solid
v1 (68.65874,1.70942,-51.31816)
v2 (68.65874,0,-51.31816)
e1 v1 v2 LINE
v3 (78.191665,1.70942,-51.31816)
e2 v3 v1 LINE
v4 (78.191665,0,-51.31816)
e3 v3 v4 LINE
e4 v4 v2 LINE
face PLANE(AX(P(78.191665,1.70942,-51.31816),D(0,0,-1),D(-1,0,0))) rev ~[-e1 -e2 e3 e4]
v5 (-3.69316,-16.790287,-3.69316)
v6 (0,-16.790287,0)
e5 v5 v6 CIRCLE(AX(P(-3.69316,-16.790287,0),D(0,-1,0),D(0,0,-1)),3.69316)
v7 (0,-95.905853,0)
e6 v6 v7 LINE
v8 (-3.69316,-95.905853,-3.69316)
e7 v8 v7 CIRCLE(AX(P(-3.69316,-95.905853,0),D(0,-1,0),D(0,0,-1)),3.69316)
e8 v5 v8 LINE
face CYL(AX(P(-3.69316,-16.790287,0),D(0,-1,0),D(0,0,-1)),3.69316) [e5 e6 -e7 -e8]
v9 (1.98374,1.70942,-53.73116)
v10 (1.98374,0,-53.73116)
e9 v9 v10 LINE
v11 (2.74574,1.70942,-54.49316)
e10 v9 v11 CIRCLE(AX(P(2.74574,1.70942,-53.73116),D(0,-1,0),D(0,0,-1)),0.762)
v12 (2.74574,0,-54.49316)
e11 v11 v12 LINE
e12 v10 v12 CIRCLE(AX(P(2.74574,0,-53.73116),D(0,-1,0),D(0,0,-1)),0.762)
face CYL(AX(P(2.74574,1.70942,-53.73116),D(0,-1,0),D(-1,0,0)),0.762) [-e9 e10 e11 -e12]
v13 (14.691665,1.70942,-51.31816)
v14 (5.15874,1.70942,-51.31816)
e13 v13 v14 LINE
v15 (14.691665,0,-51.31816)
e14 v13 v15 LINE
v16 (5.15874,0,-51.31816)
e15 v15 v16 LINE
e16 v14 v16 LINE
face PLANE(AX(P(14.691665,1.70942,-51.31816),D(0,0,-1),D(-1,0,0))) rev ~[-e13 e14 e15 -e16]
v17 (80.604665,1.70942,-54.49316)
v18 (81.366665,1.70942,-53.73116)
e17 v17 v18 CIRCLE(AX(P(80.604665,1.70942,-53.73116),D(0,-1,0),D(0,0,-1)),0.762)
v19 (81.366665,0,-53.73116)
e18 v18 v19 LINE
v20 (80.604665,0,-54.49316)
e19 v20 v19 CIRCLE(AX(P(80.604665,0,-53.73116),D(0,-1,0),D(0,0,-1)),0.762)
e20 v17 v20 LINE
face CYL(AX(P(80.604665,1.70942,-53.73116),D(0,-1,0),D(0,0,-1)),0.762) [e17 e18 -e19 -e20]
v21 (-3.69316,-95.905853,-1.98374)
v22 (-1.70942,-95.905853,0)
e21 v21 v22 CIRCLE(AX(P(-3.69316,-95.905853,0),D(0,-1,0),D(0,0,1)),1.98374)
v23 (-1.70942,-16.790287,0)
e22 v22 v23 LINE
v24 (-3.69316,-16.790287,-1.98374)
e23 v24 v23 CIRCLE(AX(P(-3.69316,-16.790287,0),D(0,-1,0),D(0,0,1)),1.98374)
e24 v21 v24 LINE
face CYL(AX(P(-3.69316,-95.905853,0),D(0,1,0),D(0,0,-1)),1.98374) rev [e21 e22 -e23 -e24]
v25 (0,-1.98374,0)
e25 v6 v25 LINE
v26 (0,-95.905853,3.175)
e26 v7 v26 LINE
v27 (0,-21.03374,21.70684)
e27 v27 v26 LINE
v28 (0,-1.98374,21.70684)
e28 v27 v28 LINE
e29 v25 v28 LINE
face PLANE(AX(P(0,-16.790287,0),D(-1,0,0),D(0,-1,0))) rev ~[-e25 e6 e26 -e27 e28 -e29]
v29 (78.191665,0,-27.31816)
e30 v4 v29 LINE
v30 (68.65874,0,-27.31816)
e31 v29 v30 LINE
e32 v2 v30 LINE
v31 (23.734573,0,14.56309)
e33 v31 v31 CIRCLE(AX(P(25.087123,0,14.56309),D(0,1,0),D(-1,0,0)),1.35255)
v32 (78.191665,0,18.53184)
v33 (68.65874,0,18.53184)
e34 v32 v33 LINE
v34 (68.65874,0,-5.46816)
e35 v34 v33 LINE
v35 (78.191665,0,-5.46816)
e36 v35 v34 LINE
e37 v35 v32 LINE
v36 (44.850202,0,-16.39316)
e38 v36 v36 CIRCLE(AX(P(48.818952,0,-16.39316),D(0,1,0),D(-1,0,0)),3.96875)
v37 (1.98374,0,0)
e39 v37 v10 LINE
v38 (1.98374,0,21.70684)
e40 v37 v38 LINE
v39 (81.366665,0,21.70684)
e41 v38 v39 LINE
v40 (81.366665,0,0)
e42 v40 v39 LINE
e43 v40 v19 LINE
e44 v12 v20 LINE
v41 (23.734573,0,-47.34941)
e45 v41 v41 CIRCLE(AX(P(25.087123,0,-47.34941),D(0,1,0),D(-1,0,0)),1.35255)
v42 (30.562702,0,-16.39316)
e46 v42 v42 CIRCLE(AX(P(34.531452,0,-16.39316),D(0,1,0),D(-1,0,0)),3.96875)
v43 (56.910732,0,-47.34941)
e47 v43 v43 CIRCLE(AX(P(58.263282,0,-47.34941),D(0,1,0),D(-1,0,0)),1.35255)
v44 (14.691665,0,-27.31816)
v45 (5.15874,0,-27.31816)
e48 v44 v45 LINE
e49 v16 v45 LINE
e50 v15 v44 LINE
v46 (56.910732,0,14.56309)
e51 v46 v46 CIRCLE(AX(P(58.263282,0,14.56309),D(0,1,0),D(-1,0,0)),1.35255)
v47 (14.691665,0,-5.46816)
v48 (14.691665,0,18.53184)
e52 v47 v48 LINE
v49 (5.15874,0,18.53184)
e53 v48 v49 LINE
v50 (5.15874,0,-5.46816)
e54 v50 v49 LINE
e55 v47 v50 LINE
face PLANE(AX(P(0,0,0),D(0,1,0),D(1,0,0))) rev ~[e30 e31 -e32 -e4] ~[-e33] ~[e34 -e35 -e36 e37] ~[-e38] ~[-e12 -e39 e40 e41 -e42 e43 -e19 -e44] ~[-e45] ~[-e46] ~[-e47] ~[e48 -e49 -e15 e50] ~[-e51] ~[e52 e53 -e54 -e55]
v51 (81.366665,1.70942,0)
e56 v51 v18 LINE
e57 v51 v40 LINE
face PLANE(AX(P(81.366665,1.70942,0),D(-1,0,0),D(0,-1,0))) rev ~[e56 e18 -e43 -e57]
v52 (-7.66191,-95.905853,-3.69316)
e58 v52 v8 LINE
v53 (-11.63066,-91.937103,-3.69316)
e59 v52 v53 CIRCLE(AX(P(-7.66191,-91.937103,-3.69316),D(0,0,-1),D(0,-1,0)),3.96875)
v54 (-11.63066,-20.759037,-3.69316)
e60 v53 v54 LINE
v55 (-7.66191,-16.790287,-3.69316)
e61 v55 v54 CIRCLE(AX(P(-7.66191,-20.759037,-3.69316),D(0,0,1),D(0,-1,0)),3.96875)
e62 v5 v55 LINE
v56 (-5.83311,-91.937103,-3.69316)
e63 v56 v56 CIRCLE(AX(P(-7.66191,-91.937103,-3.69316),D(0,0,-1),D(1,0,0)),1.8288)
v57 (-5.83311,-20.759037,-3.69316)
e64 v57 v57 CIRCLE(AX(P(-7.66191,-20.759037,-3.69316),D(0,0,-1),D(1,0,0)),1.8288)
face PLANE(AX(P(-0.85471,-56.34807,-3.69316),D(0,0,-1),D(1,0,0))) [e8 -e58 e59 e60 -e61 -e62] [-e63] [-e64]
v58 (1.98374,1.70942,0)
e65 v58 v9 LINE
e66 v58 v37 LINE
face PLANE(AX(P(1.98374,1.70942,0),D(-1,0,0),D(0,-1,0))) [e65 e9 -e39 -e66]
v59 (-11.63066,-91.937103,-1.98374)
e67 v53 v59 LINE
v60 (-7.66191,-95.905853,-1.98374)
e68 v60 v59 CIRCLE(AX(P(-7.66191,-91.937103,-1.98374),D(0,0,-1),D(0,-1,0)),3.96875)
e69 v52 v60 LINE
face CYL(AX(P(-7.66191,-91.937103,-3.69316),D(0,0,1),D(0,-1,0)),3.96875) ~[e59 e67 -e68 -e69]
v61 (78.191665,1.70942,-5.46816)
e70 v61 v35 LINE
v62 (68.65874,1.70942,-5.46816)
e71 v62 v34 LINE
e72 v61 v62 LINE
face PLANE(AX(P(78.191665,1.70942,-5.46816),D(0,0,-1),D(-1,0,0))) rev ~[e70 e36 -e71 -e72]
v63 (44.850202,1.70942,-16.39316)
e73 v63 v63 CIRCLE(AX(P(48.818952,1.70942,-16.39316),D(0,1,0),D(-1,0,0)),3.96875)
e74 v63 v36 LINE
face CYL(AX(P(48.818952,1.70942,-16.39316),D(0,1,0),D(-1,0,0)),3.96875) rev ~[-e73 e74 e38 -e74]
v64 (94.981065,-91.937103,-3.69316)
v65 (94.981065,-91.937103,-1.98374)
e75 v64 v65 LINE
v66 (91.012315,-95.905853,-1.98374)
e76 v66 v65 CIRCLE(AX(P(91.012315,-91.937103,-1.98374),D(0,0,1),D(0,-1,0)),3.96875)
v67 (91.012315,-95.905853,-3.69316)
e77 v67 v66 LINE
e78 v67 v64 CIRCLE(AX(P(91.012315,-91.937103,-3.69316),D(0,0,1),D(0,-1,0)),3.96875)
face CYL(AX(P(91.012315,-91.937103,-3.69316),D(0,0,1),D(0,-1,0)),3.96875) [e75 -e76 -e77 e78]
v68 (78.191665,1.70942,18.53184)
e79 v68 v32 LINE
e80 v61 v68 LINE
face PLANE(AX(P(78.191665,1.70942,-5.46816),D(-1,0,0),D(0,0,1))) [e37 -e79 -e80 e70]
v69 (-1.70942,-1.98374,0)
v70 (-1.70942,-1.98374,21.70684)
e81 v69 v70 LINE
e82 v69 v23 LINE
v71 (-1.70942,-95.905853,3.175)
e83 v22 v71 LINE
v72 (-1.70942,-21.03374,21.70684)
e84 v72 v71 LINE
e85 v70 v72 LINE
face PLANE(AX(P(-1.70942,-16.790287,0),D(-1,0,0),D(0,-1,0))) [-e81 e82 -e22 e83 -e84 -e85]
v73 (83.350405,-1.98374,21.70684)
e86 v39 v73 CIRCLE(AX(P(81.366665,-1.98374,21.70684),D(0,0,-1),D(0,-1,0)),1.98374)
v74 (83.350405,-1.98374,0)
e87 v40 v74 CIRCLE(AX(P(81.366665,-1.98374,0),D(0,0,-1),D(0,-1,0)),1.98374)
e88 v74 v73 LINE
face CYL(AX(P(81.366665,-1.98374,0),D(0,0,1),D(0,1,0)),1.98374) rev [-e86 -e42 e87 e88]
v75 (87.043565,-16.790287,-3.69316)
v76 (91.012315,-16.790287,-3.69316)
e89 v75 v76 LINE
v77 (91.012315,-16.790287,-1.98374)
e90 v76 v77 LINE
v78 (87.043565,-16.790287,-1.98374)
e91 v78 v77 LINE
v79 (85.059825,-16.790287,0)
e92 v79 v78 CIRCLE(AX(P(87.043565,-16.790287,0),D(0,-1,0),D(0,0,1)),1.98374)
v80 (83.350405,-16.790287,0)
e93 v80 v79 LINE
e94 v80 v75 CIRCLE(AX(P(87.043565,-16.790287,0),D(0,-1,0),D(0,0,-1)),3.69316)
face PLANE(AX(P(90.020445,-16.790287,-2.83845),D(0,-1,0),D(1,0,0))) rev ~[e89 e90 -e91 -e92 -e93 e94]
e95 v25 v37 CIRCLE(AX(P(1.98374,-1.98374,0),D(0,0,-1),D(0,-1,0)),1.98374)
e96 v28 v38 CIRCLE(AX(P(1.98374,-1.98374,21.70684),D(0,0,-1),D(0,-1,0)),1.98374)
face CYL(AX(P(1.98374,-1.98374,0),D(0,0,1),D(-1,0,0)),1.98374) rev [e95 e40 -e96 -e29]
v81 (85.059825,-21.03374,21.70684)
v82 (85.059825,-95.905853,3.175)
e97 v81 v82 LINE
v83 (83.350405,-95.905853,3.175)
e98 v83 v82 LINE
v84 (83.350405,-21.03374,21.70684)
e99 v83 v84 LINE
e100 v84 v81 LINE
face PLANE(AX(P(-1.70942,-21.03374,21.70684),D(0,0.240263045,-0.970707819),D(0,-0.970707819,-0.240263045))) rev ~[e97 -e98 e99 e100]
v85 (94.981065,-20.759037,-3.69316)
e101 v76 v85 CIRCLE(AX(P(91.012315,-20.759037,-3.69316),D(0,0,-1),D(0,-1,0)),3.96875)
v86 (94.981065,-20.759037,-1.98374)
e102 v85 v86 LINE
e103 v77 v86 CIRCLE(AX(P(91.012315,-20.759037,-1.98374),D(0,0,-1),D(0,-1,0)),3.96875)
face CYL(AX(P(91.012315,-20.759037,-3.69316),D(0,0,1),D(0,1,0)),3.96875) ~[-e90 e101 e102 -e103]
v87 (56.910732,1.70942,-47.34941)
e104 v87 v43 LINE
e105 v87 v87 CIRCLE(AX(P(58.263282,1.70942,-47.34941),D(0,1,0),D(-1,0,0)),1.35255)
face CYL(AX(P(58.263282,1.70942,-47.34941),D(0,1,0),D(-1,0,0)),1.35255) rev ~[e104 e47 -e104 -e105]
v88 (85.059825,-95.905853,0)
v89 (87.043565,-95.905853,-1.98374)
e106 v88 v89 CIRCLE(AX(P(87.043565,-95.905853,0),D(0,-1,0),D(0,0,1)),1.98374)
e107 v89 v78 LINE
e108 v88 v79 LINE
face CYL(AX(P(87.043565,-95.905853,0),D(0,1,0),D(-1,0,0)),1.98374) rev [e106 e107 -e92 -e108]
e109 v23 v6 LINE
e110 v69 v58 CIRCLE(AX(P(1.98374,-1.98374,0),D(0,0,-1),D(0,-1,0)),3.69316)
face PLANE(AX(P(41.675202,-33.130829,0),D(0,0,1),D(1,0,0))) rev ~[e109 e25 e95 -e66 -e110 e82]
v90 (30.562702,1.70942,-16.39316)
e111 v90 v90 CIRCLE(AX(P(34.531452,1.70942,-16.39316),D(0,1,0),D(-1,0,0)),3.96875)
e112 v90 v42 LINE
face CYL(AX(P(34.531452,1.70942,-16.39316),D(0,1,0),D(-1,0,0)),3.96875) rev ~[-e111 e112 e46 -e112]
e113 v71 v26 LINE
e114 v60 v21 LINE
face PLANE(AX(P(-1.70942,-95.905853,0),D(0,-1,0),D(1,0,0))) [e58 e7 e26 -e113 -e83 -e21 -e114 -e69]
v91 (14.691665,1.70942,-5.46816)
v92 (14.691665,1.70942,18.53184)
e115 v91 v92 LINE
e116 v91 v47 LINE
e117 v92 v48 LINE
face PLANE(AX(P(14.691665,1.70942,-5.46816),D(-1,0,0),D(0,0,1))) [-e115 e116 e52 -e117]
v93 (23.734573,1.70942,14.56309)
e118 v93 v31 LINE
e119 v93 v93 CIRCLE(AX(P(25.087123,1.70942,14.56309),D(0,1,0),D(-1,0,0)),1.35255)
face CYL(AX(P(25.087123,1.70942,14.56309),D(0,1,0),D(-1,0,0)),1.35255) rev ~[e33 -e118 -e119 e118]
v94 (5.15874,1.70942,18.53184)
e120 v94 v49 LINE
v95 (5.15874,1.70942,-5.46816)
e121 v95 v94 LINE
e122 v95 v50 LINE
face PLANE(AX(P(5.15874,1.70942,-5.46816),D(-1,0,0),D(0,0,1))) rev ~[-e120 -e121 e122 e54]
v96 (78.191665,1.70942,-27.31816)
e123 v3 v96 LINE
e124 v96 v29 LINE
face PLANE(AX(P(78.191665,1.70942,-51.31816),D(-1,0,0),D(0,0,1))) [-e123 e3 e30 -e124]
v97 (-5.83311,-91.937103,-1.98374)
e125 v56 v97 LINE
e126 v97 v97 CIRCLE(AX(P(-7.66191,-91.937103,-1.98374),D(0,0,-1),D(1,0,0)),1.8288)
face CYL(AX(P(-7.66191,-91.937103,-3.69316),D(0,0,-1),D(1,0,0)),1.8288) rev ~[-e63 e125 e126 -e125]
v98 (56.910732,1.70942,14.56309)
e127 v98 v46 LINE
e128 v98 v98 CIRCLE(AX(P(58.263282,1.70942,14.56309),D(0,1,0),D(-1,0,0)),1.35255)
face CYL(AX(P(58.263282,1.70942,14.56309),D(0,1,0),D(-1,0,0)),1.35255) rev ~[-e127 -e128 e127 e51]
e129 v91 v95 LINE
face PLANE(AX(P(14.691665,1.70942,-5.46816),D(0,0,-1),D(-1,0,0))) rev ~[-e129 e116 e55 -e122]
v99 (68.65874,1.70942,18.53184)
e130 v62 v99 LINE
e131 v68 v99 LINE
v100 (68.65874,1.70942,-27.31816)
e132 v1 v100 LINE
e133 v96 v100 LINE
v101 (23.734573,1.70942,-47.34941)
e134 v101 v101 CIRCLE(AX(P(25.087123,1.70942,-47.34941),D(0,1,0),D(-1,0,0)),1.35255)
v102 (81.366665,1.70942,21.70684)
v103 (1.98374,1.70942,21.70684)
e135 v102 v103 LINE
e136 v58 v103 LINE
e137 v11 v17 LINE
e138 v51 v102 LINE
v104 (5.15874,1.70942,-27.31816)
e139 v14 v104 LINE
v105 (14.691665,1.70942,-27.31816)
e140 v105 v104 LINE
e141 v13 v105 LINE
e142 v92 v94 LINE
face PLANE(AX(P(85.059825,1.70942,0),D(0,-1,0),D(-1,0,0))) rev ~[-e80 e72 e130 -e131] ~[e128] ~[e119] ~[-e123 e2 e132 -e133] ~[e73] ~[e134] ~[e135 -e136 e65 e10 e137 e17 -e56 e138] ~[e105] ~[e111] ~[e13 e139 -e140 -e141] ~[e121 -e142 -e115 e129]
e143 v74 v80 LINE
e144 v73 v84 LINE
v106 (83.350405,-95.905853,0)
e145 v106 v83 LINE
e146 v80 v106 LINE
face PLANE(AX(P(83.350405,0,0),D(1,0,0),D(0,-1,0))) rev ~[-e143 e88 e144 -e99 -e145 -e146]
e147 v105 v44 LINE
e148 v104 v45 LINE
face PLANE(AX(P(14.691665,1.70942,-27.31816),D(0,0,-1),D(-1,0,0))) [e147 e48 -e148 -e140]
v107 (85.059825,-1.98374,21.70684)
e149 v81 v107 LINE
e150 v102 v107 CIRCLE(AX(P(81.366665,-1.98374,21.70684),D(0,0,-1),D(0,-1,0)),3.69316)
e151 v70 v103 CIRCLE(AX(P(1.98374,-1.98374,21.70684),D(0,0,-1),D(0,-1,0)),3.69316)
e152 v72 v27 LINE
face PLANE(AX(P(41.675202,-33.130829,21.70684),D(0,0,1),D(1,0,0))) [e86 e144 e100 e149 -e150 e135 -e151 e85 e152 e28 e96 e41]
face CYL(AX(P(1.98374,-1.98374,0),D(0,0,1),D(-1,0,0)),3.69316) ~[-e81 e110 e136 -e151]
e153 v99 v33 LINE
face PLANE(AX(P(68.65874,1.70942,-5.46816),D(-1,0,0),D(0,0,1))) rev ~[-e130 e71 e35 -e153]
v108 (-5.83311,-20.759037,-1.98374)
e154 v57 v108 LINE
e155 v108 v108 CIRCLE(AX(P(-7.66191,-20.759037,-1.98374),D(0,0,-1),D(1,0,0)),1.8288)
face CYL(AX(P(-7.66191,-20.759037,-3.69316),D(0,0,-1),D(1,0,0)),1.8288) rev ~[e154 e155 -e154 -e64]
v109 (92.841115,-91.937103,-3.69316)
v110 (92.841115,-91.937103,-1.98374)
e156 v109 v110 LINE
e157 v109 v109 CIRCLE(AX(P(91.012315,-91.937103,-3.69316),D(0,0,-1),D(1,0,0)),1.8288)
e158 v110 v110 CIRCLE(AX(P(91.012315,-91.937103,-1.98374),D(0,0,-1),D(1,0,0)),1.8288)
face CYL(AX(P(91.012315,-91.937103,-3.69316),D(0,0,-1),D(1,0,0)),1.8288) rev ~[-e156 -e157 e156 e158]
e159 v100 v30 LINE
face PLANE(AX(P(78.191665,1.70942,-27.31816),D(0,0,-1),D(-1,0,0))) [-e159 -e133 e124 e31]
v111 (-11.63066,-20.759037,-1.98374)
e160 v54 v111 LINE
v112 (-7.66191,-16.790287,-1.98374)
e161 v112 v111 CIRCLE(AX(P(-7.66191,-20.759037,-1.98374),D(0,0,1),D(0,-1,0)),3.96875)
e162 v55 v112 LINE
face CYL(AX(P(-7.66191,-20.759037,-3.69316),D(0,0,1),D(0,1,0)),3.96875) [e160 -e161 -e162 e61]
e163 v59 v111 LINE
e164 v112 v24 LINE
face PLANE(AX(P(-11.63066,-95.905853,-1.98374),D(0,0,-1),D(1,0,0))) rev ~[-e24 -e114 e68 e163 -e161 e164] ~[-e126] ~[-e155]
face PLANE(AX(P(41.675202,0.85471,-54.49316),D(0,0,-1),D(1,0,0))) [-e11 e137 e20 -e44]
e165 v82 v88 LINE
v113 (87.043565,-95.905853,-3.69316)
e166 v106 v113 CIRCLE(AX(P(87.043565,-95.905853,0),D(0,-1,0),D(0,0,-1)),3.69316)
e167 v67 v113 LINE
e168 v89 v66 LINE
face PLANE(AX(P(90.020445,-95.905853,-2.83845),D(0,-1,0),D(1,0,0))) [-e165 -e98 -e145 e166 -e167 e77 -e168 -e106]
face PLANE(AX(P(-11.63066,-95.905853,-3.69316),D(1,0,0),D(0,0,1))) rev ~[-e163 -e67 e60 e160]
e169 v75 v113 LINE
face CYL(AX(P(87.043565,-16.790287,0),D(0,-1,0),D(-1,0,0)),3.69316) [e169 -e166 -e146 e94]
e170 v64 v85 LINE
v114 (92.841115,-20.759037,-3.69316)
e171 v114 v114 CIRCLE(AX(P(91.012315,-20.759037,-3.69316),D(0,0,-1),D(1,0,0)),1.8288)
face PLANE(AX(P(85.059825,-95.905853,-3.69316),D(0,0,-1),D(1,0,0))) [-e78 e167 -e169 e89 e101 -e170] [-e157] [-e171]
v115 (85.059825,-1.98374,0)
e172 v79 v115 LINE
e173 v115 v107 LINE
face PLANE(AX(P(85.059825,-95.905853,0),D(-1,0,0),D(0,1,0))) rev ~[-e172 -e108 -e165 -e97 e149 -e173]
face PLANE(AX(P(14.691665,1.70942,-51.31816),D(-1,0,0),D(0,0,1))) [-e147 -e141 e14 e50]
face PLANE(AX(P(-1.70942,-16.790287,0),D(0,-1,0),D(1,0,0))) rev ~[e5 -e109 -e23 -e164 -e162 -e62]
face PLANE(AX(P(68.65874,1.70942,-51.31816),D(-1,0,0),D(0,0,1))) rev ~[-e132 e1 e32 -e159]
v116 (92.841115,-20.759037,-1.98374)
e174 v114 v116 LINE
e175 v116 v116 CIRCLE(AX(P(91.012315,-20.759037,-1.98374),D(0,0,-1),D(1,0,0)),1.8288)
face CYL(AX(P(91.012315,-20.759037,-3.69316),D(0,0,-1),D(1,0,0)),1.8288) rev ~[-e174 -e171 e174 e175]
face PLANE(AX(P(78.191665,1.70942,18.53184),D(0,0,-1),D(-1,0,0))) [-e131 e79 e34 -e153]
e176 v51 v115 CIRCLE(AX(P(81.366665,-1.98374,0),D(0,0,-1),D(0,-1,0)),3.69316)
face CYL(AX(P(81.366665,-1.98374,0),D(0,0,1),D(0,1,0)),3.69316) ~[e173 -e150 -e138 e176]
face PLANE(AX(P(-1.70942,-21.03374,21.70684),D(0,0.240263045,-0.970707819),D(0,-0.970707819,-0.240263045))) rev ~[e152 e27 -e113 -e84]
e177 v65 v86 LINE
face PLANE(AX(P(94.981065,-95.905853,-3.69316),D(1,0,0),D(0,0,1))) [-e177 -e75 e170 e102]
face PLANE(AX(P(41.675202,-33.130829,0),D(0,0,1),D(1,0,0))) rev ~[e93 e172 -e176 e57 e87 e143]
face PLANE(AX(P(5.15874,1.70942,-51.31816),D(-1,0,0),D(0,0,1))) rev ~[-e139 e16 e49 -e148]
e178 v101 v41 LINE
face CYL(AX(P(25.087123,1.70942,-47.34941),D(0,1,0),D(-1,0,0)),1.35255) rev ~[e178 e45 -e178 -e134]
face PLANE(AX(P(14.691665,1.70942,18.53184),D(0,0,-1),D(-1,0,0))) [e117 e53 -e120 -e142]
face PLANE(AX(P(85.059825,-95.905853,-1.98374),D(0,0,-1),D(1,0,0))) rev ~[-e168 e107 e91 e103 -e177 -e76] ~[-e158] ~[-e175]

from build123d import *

# Parameters (mm, degrees)
F1_DEPTH  = 21.70684
F2_W      = 1.70942
F2_H      = 79.1155667
F3_DEPTH  = 3.69316
F4_W      = 9.92124
F4_H      = 1.70942
F5_DEPTH  = 79.1155667
F6_W      = 79.3829248
F6_H      = 1.70942
F7_DEPTH  = 54.49316
F8_W      = 9.5329248
F8_H      = 24
F8_R      = 1.35255
F8_R_2    = 3.96875
F9_DEPTH  = 1.70942
F10_R     = 0.762
F11_R     = 3.96875
F12_R     = 3.69316
F13_R     = 1.98374
F15_DEPTH = 86.7692448
F16_R     = 1.8288
F17_DEPTH = 1.70942


with BuildPart() as f1:
    # F0 (on Top) → F1 (new body)
    with BuildSketch(Plane.XY):
        Polygon((-1.70942, -95.9058534), (0, -95.9058534), (0, 0), (83.3504048, 0), (83.3504048, -95.9058534), (85.0598248, -95.9058534), (85.0598248, 1.70942), (-1.70942, 1.70942), align=None)
    extrude(amount=F1_DEPTH)

    # F2 (on face) → F3 (join)
    with BuildSketch(Plane(origin=(0, 0, 0), x_dir=(1, 0, 0), z_dir=(0, 0, -1))):
        with Locations((-0.85471, 56.34807005)):
            Rectangle(F2_W, F2_H)
        with Locations((84.2051148, 56.34807005)):
            Rectangle(F2_W, F2_H)
    extrude(amount=F3_DEPTH)

    # F4 (on face) → F5 (join, through all)
    with BuildSketch(Plane.XZ.offset(95.9058534)):
        with Locations((90.0204448, -2.83845)):
            Rectangle(F4_W, F4_H)
        with Locations((-6.67004, -2.83845)):
            Rectangle(F4_W, F4_H)
    extrude(amount=-F5_DEPTH)

    # F6 (on face) → F7 (join)
    with BuildSketch(Plane(origin=(0, 0, 0), x_dir=(1, 0, 0), z_dir=(0, 0, -1))):
        with Locations((41.6752024, -0.85471)):
            Rectangle(F6_W, F6_H)
    extrude(amount=F7_DEPTH)

    # F8 (on face) → F9 (cut, through all)
    with BuildSketch(Plane(origin=(0, 1.70942, 0), x_dir=(-1, 0, 0), z_dir=(0, 1, 0))):
        with Locations((-9.9252024, -39.31816)):
            Rectangle(F8_W, F8_H)
        with Locations((-9.9252024, 6.53184)):
            Rectangle(F8_W, F8_H)
        with Locations((-73.4252024, 6.53184)):
            Rectangle(F8_W, F8_H)
        with Locations((-73.4252024, -39.31816)):
            Rectangle(F8_W, F8_H)
        with Locations((-25.0871228, -47.34941)):
            Circle(F8_R)
        with Locations((-58.263282, -47.34941)):
            Circle(F8_R)
        with Locations((-58.263282, 14.56309)):
            Circle(F8_R)
        with Locations((-25.0871228, 14.56309)):
            Circle(F8_R)
        with Locations((-48.8189524, -16.39316)):
            Circle(F8_R_2)
        with Locations((-34.5314524, -16.39316)):
            Circle(F8_R_2)
    extrude(amount=-F9_DEPTH, mode=Mode.SUBTRACT)

    # F10
    f10_edges = [f1.edges().sort_by_distance(p)[0] for p in [
        (1.98374, 0.85471, -54.49316),
        (81.366665, 0.85471, -54.49316),
    ]]
    fillet(f10_edges, radius=F10_R)

    # F11
    f11_edges = [f1.edges().sort_by_distance(p)[0] for p in [
        (94.981065, -95.905853, -2.83845),
        (-11.63066, -16.790287, -2.83845),
        (-11.63066, -95.905853, -2.83845),
        (94.981065, -16.790287, -2.83845),
    ]]
    fillet(f11_edges, radius=F11_R)

    # F12
    f12_edges = [f1.edges().sort_by_distance(p)[0] for p in [
        (0, -56.34807, -3.69316),
        (-1.70942, 1.70942, 10.85342),
        (85.059825, 1.70942, 10.85342),
        (83.350405, -56.34807, -3.69316),
    ]]
    fillet(f12_edges, radius=F12_R)

    # F13
    f13_edges = [f1.edges().sort_by_distance(p)[0] for p in [
        (83.350405, 0, 10.85342),
        (0, 0, 10.85342),
        (85.059825, -56.34807, -1.98374),
        (-1.70942, -56.34807, -1.98374),
    ]]
    fillet(f13_edges, radius=F13_R)

    # F14 (on face) → F15 (cut, through all)
    with BuildSketch(Plane(origin=(-1.70942, 0, 0), x_dir=(0, -1, 0), z_dir=(-1, 0, 0))):
        Polygon((95.9058534, 21.70684), (21.03374, 21.70684), (95.9058534, 3.175), align=None)
    extrude(amount=-F15_DEPTH, mode=Mode.SUBTRACT)

    # F16 (on face) → F17 (cut, through all)
    with BuildSketch(Plane(origin=(0, 0, -3.69316), x_dir=(1, 0, 0), z_dir=(0, 0, -1))):
        with Locations((-7.66191, 91.9371034)):
            Circle(F16_R)
        with Locations((-7.66191, 20.7590367)):
            Circle(F16_R)
        with Locations((91.0123148, 91.9371034)):
            Circle(F16_R)
        with Locations((91.0123148, 20.7590367)):
            Circle(F16_R)
    extrude(amount=-F17_DEPTH, mode=Mode.SUBTRACT)


solid = f1.part
